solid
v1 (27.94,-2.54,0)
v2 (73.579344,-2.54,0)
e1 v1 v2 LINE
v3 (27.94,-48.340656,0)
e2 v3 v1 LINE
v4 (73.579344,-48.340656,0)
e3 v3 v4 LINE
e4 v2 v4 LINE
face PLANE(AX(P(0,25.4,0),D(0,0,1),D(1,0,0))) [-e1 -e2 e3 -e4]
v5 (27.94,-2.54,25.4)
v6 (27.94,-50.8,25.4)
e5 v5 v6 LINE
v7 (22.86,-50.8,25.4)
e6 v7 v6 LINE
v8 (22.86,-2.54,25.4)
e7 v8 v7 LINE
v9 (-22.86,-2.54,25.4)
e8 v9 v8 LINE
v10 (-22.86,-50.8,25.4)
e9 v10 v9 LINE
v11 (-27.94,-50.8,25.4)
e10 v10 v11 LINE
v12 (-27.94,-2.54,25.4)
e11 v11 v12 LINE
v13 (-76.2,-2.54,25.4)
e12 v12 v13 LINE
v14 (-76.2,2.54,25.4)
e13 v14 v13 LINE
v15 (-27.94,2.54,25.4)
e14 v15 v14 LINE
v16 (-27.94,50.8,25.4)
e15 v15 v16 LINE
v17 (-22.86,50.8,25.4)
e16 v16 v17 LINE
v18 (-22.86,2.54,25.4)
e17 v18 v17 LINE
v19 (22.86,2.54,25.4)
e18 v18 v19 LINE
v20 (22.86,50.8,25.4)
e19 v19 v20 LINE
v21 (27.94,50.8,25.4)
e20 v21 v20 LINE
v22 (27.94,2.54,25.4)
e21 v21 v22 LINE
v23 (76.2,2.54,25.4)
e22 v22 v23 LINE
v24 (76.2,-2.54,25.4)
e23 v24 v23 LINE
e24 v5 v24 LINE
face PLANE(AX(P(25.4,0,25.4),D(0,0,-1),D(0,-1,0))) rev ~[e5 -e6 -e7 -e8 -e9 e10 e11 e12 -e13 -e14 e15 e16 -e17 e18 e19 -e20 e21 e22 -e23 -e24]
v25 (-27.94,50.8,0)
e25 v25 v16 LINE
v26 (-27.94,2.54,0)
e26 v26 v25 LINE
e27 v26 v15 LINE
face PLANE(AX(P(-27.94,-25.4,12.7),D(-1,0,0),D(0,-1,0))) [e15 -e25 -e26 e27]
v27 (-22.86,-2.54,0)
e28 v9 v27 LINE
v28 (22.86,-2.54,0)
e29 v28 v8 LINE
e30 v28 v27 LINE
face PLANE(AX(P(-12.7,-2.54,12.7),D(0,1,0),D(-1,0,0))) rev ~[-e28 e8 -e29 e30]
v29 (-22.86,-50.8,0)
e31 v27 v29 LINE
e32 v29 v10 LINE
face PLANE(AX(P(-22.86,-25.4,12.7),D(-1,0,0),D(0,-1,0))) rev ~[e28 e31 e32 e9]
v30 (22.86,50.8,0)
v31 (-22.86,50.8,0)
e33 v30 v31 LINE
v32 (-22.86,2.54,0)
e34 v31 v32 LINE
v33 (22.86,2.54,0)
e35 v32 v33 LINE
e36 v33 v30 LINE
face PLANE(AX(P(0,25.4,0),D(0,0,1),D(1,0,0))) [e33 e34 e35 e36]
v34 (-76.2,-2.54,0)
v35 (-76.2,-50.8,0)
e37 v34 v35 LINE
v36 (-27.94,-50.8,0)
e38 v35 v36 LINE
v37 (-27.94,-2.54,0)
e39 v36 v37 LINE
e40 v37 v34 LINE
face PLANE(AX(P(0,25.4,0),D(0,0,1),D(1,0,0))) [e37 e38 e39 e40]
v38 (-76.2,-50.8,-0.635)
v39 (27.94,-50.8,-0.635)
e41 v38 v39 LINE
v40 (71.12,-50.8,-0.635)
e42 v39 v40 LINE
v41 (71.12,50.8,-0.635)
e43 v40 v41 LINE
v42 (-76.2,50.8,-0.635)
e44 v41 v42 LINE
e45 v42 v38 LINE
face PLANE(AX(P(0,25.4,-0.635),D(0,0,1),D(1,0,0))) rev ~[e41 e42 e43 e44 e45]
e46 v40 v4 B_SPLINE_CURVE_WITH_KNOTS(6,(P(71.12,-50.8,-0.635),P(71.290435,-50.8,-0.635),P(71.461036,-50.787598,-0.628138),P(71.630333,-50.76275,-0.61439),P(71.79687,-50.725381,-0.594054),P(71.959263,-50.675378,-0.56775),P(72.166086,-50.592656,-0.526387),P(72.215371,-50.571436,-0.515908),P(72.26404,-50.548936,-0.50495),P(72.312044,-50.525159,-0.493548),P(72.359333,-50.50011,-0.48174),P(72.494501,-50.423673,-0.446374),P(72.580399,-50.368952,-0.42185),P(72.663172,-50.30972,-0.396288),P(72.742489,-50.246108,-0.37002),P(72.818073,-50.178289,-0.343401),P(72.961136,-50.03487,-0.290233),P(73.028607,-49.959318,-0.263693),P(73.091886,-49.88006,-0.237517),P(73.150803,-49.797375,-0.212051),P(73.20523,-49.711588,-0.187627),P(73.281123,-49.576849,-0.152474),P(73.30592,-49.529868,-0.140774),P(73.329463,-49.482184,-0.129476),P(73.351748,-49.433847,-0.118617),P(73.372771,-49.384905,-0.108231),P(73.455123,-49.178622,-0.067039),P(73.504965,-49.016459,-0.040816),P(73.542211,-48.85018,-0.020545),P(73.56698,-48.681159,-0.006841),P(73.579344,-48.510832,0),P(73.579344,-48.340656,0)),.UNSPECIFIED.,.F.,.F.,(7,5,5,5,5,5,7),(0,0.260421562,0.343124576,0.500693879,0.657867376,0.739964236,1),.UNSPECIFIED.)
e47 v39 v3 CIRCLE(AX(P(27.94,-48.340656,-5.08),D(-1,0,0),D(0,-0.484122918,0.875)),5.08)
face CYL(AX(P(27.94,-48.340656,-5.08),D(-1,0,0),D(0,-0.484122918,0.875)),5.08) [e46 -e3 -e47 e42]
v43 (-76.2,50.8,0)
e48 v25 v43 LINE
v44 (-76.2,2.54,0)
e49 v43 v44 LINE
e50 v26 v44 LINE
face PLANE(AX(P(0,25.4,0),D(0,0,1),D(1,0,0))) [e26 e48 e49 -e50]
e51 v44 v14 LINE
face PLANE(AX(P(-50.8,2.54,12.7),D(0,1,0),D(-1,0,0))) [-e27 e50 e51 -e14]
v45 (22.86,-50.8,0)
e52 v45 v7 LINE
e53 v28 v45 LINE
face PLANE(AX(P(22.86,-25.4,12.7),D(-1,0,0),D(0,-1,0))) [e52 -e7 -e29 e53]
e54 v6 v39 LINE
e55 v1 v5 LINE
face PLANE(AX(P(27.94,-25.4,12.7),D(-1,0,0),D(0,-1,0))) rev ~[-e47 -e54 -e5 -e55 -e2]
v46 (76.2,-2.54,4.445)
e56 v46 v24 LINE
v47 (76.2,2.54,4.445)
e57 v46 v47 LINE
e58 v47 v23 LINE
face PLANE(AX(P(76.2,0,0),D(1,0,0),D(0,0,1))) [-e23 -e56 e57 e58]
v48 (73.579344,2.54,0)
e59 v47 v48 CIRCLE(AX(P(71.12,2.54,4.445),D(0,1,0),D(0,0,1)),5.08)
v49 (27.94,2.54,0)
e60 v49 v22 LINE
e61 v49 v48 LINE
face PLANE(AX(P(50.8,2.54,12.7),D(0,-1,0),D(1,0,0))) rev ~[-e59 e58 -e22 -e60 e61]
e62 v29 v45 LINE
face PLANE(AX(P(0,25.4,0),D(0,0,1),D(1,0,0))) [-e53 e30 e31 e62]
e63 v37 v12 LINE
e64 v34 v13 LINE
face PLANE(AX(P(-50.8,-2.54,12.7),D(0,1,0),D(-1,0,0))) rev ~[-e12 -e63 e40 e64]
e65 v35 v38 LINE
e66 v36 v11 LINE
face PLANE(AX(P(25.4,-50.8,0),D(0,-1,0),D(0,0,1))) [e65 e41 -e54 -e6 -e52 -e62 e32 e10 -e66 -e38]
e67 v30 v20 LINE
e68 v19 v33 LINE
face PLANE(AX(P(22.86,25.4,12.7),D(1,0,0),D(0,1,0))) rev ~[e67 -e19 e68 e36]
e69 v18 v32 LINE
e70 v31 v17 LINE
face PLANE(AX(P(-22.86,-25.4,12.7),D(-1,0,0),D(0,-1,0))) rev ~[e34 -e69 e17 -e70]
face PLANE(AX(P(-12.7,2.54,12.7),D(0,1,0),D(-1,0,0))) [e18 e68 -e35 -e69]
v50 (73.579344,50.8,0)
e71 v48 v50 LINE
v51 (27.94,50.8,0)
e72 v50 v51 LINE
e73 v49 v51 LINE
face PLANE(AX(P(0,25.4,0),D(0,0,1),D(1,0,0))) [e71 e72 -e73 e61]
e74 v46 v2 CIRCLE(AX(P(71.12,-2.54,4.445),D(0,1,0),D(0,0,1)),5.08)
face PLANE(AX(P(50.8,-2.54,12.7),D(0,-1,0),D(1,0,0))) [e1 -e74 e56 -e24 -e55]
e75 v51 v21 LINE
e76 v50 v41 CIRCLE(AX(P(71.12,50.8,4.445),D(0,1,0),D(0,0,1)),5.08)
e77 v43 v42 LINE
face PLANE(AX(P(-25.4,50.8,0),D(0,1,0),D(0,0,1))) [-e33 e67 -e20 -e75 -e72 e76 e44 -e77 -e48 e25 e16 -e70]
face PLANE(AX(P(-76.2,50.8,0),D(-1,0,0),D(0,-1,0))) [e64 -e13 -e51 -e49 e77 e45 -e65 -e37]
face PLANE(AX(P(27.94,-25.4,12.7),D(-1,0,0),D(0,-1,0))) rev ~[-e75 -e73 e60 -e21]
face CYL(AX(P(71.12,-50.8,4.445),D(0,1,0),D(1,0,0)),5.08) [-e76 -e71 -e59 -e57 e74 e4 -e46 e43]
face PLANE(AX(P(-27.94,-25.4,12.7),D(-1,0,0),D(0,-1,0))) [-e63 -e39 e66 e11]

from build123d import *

# Parameters (mm, degrees)
F0_W         = 50.8
F0_H         = 50.8
F16_DEPTH    = 0.635
F13_E4_W     = 50.8
F13_E4_H     = 25.4
F17_DEPTH    = 2.54
F11_E6_W     = 50.8
F11_E6_H     = 25.4
F11_E5_W     = 50.8
F11_E5_H     = 25.4
F18_DEPTH    = 2.54
F9_E0_W      = 25.4
F9_E0_H      = 25.4
F9_E3_W      = 25.4
F9_E3_H      = 25.4
F19_DEPTH    = 2.54
F7_E7_W      = 50.8
F7_E7_H      = 25.4
F20_DEPTH    = 2.54
F3_E1_W      = 50.8
F3_E1_H      = 25.4
F21_DEPTH    = 2.54
F1_E2_W      = 50.8
F1_E2_H      = 25.4
F22_DEPTH    = 2.54
F23_R        = 5.08
F24_T1_DEPTH = 51.7877054869


# Not quite as in the source:
# - a fillet or chamfer that OpenCascade refuses, or shapes differently, is made with other operations: its cross-section is extruded or revolved along the edge and cut away or added
# - the program builds the solid bodies; features that only make, move or delete a surface that nothing else refers to are left out


with BuildPart() as f16:
    # F0 (on Top) → F16 (new body)
    with BuildSketch(Plane.XY):
        Polygon((-25.4, 0), (0, 0), (25.4, 0), (25.4, 50.8), (-25.4, 50.8), align=None)
        Polygon((25.4, 0), (0, 0), (-25.4, 0), (-25.4, -50.8), (25.4, -50.8), align=None)
        with Locations((50.8, -25.4)):
            Rectangle(F0_W, F0_H)
        with Locations((50.8, 25.4)):
            Rectangle(F0_W, F0_H)
        with Locations((-50.8, -25.4)):
            Rectangle(F0_W, F0_H)
        with Locations((-50.8, 25.4)):
            Rectangle(F0_W, F0_H)
    extrude(amount=-F16_DEPTH)

    # F13_E4 (on explicit) → F17 (join, symmetric)
    with BuildSketch(Plane(origin=(-25.4, 0, 0), x_dir=(-1, 0, 0), z_dir=(0, 1, 0))):
        with Locations((25.4, 12.7)):
            Rectangle(F13_E4_W, F13_E4_H)
    extrude(amount=F17_DEPTH, both=True)

    # F11_E6 (on explicit) + F11_E5 (on explicit) → F18 (join, symmetric)
    with BuildSketch(Plane.YZ.offset(-25.4)):
        with Locations((25.4, 12.7)):
            Rectangle(F11_E6_W, F11_E6_H)
    with BuildSketch(Plane(origin=(-25.4, 0, 0), x_dir=(0, -1, 0), z_dir=(-1, 0, 0))):
        with Locations((25.4, 12.7)):
            Rectangle(F11_E5_W, F11_E5_H)
    extrude(amount=F18_DEPTH, both=True, dir=(1, 0, 0))

    # F9_E0 (on explicit) + F9_E3 (on explicit) → F19 (join, symmetric)
    with BuildSketch(Plane.XZ):
        with Locations((12.7, 12.7)):
            Rectangle(F9_E0_W, F9_E0_H)
    with BuildSketch(Plane(origin=(0, 0, 0), x_dir=(-1, 0, 0), z_dir=(0, 1, 0))):
        with Locations((12.7, 12.7)):
            Rectangle(F9_E3_W, F9_E3_H)
    extrude(amount=F19_DEPTH, both=True, dir=(0, -1, 0))

    # F7_E7 (on explicit) → F20 (join, symmetric)
    with BuildSketch(Plane.YZ.offset(25.4)):
        with Locations((25.4, 12.7)):
            Rectangle(F7_E7_W, F7_E7_H)
    extrude(amount=F20_DEPTH, both=True)

    # F3_E1 (on explicit) → F21 (join, symmetric)
    with BuildSketch(Plane(origin=(25.4, 0, 0), x_dir=(0, -1, 0), z_dir=(-1, 0, 0))):
        with Locations((25.4, 12.7)):
            Rectangle(F3_E1_W, F3_E1_H)
    extrude(amount=F21_DEPTH, both=True)

    # F1_E2 (on explicit) → F22 (join, symmetric)
    with BuildSketch(Plane(origin=(25.4, 0, 0), x_dir=(1, 0, 0), z_dir=(0, -1, 0))):
        with Locations((25.4, 12.7)):
            Rectangle(F1_E2_W, F1_E2_H)
    extrude(amount=F22_DEPTH, both=True)

    # F23
    f23_edges = [f16.edges().sort_by_distance(p)[0] for p in [
        (76.2, 0, -0.635),
    ]]
    fillet(f23_edges, radius=F23_R)

    # F24: fillet of radius 5.08 on 1 edges, made by hand

    # F24_s2 → F24_t1 (cut)
    with BuildSketch(Plane.YZ.offset(27.94)):
        with BuildLine():
            ThreePointArc((-50.8, -0.635), (-49.6106555752, -0.1613111503), (-48.3406555752, 0))
            Line((-48.3406555752, 0), (-50.8, 0))
            Line((-50.8, 0), (-50.8, -0.635))
        make_face()
    extrude(amount=F24_T1_DEPTH, mode=Mode.SUBTRACT)


solid = f16.part
